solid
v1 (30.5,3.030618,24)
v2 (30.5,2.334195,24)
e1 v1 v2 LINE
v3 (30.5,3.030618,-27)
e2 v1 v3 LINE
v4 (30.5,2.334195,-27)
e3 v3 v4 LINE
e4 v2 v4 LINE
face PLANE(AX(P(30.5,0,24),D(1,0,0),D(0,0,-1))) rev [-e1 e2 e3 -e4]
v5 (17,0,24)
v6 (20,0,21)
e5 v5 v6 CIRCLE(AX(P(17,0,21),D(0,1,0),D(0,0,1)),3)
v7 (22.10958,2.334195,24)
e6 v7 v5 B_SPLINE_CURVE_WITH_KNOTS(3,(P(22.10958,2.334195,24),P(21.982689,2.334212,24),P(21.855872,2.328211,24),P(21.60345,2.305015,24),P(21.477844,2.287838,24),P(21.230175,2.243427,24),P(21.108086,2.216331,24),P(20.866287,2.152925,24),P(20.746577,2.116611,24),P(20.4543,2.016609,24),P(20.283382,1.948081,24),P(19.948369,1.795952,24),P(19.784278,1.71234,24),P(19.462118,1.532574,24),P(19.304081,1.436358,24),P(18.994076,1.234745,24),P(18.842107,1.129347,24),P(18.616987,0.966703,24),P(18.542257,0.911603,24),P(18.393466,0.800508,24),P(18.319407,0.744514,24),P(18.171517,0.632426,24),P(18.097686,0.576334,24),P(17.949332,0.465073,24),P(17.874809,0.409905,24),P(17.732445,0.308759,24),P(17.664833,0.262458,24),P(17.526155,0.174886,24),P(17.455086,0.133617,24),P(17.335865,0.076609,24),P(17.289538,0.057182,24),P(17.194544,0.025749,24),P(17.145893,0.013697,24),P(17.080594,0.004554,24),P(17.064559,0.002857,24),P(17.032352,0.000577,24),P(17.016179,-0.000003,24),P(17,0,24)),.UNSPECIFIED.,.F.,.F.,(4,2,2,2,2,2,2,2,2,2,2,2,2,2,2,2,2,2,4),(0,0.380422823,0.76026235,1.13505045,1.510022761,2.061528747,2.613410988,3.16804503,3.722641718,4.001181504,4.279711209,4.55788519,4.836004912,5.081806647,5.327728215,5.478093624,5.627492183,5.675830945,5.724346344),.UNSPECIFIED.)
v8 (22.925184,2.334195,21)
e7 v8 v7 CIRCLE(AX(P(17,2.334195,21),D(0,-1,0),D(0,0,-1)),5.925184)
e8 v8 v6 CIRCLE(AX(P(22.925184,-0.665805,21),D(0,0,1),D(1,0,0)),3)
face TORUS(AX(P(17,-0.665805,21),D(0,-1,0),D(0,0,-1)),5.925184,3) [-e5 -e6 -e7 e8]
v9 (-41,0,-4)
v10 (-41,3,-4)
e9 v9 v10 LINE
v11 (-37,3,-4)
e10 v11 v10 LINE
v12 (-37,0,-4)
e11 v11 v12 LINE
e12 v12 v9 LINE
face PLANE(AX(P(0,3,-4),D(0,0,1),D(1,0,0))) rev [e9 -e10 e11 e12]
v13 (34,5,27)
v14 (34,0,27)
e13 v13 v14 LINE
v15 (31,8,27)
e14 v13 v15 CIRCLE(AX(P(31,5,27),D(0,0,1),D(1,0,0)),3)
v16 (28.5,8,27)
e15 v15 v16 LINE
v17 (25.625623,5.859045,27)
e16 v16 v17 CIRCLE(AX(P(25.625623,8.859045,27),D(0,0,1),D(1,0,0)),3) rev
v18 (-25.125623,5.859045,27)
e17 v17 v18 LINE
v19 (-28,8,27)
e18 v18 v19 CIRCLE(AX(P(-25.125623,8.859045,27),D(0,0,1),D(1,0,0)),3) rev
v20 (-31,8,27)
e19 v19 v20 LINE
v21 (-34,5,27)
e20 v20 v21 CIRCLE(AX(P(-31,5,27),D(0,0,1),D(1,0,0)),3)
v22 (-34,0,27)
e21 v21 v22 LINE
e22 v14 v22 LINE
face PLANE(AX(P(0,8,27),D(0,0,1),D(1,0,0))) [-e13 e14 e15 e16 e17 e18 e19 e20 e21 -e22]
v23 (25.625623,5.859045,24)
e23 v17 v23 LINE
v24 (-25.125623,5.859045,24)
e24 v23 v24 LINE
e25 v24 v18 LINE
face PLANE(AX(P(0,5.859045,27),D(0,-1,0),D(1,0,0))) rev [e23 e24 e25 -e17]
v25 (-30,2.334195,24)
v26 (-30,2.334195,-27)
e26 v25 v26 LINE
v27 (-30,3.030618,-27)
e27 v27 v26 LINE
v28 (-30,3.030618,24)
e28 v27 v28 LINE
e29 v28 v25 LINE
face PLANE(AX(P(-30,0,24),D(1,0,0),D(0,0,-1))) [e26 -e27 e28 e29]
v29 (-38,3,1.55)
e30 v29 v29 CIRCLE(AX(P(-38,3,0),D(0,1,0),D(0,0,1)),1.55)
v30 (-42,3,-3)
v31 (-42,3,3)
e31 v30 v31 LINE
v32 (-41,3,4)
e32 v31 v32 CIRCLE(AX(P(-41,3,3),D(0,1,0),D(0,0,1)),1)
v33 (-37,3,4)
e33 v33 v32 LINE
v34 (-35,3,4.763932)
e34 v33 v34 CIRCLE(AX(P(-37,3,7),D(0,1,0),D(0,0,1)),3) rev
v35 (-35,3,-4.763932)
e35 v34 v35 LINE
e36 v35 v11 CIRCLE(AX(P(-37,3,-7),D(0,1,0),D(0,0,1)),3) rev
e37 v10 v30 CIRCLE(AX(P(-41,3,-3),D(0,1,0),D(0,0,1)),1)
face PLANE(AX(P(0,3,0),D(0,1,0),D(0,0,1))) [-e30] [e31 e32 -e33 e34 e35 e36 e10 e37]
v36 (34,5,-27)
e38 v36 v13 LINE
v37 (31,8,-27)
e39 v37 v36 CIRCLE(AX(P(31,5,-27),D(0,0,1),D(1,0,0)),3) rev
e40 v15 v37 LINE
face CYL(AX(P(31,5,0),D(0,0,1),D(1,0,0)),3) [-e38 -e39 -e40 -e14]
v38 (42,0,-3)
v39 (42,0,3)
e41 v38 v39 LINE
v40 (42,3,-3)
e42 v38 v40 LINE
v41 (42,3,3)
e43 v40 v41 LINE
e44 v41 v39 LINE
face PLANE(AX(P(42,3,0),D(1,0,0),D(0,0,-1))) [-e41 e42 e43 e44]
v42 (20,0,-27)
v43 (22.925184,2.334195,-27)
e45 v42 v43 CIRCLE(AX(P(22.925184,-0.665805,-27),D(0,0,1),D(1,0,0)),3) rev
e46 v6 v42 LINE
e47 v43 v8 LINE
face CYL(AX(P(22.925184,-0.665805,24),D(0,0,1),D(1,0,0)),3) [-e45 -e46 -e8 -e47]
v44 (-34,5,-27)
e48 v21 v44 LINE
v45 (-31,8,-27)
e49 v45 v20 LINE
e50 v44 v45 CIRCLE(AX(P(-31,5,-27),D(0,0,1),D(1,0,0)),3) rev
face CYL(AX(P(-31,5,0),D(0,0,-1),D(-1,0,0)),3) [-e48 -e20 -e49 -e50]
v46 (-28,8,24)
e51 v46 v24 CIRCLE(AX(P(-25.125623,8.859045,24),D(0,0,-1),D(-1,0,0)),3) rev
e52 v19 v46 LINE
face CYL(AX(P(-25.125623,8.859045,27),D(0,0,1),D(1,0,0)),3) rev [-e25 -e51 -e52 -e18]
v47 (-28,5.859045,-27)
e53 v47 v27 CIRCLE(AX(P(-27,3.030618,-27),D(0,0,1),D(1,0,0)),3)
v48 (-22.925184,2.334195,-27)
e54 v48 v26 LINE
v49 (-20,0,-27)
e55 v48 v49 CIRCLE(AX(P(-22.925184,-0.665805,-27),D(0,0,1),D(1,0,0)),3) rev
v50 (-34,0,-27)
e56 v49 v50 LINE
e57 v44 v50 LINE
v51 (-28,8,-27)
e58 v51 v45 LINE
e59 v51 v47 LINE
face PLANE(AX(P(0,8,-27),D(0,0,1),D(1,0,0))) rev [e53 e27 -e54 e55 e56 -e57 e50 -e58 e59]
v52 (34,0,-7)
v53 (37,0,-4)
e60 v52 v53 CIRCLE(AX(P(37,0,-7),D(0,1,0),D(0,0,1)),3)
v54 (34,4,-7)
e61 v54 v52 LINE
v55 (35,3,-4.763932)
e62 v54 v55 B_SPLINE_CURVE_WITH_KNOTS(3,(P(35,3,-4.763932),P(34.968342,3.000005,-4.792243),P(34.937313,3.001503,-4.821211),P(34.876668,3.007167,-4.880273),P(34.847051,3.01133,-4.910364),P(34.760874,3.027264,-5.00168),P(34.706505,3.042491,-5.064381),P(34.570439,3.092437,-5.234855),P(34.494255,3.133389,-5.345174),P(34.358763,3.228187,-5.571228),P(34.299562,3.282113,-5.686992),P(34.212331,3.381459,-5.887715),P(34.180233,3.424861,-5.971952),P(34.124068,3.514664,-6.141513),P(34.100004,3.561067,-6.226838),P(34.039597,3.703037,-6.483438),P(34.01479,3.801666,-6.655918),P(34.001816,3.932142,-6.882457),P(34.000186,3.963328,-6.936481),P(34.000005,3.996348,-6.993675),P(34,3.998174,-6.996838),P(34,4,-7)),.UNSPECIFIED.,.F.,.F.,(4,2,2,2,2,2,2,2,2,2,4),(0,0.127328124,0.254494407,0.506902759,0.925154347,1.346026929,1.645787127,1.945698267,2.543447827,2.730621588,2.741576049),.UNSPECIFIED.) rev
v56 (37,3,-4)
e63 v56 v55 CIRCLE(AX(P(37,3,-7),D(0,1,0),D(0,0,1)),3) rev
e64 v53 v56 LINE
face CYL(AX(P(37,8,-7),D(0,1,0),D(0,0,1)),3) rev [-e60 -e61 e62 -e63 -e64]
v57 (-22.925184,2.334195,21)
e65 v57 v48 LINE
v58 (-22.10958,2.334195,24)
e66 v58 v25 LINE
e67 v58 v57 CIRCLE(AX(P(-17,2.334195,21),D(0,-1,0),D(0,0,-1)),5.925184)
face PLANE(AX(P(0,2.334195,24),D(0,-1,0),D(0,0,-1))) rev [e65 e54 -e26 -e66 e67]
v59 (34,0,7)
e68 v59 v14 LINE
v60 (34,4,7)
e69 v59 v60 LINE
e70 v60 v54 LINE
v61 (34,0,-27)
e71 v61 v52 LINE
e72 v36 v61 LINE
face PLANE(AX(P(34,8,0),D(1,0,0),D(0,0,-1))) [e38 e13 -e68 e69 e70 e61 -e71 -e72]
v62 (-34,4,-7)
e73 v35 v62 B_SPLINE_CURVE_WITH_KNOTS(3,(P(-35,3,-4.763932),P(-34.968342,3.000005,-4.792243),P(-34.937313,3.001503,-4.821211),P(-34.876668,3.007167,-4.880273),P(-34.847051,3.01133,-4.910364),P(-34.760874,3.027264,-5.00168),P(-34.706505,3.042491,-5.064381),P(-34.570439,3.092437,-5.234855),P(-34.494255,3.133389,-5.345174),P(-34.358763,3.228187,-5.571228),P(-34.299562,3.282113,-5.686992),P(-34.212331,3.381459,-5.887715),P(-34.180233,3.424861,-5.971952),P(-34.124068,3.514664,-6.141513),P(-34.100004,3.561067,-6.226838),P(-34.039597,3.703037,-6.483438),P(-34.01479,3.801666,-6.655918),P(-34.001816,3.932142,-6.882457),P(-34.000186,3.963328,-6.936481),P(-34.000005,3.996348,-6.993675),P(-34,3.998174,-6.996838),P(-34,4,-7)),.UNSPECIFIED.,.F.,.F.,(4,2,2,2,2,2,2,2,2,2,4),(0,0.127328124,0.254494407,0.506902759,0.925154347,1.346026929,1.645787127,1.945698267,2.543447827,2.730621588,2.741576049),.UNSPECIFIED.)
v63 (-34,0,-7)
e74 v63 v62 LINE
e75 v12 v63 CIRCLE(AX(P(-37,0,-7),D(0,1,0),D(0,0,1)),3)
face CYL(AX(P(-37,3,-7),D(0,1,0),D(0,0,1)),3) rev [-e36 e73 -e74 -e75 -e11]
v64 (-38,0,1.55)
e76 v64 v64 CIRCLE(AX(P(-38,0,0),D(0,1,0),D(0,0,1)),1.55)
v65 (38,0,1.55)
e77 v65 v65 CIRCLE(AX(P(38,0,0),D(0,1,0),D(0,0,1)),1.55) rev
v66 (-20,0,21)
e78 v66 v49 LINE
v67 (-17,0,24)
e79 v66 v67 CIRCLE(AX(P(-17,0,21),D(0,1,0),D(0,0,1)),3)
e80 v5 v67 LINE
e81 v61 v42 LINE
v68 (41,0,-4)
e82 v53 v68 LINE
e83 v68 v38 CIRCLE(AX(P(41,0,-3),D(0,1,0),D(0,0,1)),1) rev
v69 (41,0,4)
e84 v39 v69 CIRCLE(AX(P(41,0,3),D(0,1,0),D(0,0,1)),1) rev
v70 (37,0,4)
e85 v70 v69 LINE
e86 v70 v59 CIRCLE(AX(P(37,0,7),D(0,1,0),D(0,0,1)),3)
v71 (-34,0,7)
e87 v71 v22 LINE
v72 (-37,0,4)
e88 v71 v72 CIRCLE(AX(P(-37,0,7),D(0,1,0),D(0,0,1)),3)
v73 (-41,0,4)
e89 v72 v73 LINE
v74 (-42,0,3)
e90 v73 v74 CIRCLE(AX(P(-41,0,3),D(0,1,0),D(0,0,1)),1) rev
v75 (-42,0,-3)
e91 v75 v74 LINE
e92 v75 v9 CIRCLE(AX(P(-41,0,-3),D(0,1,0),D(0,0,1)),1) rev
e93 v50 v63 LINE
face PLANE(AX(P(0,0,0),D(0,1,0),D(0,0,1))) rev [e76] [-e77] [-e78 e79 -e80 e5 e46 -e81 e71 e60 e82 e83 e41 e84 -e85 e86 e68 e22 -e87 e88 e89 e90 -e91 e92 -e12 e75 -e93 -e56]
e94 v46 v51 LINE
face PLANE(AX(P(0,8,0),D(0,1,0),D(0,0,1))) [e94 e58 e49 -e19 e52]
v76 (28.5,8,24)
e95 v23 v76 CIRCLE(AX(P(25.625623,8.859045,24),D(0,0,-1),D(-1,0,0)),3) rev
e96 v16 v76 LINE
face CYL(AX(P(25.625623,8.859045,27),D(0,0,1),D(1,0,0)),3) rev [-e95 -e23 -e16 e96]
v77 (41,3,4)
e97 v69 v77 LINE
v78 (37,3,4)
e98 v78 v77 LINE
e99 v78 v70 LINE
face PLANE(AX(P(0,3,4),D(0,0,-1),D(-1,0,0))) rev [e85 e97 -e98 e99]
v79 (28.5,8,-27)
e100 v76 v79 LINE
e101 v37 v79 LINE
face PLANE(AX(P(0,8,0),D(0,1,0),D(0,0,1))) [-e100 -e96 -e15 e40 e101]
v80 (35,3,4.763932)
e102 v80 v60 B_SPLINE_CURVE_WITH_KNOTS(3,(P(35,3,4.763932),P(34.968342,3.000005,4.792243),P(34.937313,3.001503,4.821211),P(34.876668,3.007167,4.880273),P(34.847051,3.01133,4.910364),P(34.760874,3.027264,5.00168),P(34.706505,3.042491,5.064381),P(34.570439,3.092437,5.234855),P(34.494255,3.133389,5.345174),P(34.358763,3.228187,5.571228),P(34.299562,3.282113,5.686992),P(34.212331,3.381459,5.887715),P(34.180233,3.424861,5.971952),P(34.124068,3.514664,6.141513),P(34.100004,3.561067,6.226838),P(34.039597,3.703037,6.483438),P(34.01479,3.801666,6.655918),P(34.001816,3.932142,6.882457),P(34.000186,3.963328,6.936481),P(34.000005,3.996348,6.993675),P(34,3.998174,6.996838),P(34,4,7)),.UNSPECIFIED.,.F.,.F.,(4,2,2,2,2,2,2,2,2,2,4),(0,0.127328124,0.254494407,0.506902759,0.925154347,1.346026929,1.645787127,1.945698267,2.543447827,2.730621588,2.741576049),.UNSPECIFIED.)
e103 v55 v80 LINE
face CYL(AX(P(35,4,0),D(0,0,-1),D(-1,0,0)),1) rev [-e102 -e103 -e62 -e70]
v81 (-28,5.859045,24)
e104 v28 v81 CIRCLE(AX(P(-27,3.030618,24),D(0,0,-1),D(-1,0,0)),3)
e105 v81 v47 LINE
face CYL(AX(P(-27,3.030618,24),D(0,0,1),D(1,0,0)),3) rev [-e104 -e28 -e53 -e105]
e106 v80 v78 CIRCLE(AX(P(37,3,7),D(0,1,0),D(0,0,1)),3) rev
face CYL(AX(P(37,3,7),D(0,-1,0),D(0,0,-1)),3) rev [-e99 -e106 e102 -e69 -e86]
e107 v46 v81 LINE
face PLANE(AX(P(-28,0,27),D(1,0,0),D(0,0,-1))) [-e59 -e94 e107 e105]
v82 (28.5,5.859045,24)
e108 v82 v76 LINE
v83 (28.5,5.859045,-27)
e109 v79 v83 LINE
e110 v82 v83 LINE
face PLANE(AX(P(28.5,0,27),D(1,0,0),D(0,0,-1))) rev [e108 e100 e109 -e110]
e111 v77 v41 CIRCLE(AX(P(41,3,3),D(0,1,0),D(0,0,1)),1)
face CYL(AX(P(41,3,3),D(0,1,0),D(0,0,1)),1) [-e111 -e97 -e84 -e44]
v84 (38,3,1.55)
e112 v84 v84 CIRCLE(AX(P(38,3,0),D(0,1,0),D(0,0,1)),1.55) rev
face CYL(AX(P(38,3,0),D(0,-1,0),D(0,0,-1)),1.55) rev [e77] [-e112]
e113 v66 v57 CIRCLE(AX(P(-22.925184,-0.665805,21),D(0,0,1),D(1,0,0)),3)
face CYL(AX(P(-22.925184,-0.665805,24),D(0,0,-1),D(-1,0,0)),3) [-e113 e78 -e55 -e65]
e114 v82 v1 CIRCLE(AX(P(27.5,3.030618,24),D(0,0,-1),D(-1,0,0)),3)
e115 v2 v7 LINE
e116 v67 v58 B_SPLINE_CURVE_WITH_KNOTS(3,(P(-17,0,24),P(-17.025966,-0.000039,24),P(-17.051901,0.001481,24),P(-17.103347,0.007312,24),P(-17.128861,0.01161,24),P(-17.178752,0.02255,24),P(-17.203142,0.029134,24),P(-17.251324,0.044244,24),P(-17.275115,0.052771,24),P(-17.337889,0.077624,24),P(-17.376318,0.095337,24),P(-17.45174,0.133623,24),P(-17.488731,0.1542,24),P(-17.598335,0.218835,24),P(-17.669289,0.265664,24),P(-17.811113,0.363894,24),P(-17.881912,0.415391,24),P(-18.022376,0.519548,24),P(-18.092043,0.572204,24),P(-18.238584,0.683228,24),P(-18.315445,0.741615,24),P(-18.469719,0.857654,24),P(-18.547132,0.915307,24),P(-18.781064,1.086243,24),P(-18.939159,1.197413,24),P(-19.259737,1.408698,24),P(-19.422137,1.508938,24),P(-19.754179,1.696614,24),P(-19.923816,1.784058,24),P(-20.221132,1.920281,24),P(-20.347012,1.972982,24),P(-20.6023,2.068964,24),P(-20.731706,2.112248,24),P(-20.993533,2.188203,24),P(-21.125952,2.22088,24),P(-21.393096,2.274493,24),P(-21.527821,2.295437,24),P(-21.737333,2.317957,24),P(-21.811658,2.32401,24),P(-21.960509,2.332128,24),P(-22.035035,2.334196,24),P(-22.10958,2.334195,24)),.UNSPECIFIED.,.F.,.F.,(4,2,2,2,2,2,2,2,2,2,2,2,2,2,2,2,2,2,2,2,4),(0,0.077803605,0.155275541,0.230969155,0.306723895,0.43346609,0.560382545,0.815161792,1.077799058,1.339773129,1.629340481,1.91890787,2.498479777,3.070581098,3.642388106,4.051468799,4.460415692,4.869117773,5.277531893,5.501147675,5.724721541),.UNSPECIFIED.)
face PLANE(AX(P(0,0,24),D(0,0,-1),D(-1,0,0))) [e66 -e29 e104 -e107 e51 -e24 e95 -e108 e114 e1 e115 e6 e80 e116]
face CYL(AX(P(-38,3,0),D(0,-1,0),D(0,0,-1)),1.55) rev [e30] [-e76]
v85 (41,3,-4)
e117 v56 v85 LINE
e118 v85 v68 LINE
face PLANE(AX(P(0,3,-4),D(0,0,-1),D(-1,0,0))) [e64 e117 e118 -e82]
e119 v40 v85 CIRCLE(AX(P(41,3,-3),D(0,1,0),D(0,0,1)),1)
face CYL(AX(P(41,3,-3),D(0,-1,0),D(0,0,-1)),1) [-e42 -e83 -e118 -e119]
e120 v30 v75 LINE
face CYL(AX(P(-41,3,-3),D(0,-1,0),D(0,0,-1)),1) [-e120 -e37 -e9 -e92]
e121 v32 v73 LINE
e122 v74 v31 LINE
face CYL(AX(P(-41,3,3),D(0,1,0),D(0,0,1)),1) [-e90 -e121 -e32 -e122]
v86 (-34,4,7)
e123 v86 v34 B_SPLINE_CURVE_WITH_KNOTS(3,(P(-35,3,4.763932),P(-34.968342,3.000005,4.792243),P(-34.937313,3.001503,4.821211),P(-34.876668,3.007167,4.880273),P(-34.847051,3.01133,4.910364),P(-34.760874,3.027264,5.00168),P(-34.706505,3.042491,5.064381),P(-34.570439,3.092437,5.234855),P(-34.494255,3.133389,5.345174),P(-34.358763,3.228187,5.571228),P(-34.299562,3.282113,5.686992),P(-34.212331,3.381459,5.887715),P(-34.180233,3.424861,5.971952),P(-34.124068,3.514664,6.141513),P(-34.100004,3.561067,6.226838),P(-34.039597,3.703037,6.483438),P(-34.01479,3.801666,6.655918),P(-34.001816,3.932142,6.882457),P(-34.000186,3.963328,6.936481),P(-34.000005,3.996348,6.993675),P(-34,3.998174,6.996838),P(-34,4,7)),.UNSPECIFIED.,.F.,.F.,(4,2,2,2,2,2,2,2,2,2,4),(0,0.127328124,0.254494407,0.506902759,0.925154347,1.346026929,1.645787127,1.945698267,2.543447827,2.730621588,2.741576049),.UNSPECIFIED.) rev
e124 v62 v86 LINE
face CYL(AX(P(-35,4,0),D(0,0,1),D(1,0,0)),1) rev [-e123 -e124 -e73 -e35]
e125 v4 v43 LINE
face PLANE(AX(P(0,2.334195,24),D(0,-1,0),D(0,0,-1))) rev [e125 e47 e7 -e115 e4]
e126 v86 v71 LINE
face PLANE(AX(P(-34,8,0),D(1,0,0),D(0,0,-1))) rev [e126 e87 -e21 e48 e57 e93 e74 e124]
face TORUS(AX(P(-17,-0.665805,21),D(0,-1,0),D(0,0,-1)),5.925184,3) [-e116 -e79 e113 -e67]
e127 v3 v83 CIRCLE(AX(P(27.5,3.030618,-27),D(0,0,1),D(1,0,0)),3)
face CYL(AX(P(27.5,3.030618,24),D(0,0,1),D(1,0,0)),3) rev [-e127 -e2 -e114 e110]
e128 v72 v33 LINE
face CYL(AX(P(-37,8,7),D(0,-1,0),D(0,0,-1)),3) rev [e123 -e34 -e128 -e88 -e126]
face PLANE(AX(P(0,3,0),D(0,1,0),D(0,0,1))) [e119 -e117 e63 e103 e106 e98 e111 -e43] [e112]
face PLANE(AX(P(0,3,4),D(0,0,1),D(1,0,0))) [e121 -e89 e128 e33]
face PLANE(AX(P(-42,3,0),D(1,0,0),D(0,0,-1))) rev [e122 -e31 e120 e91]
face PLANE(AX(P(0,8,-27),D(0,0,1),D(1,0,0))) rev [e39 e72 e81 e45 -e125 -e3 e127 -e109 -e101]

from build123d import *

# Parameters (mm, degrees)
SKETCH1_W           = 68
SKETCH1_H           = 54
BOSS_EXTRUDE1_DEPTH = 8
CUT_EXTRUDE1_DEPTH  = 51
SKETCH2_3_W         = 28.5
SKETCH2_3_H         = 2.140954579
SKETCH2_3_W_2       = 28
CUT_EXTRUDE2_DEPTH  = 65.311740763
FILLET1_R           = 3
FILLET2_R           = 3
SKETCH3_W           = 40
SKETCH3_H           = 2.334194627
CUT_EXTRUDE3_DEPTH  = 51
FILLET3_R           = 3
FILLET4_R           = 3
FILLET5_R           = 3
SKETCH1_3_W         = 8
SKETCH1_3_H         = 8
SKETCH1_3_R         = 1.55
BOSS_EXTRUDE2_DEPTH = 3
FILLET6_R           = 3
FILLET7_R           = 1
FILLET8_R           = 1
FILLET9_R           = 1


with BuildPart() as part:
    # Sketch1 → Boss-Extrude1 (new body)
    with BuildSketch(Plane(origin=(0, 0, 0), x_dir=(1, 0, 0), z_dir=(0, 1, 0))):
        Rectangle(SKETCH1_W, SKETCH1_H)
    extrude(amount=BOSS_EXTRUDE1_DEPTH)

    # Sketch2 → Cut-Extrude1 (cut)
    with BuildSketch(Plane(origin=(0, 0, -27), x_dir=(-1, 0, 0), z_dir=(0, 0, -1))):
        Polygon((-30.5, 2.334194627), (0, 2.334194627), (0, 5.859045421), (-28.5, 5.859045421), (-30.5, 5.859045421), align=None)
        Polygon((0, 5.859045421), (0, 2.334194627), (30, 2.334194627), (30, 5.859045421), (28, 5.859045421), align=None)
    extrude(amount=-CUT_EXTRUDE1_DEPTH, mode=Mode.SUBTRACT)

    # Sketch2<3> → Cut-Extrude2 (cut, through all)
    with BuildSketch(Plane(origin=(0, 0, -27), x_dir=(-1, 0, 0), z_dir=(0, 0, -1))):
        with Locations((-14.25, 6.929522711)):
            Rectangle(SKETCH2_3_W, SKETCH2_3_H)
        with Locations((14, 6.929522711)):
            Rectangle(SKETCH2_3_W_2, SKETCH2_3_H)
    extrude(amount=-CUT_EXTRUDE2_DEPTH, mode=Mode.SUBTRACT)

    # Fillet1
    # the kernel refuses this fillet: 3 mm, written as the material it adds along each edge
    with BuildSketch(Plane(origin=(30.5, 5.859045421, -27), x_dir=(0, -1, 0), z_dir=(0, 0, 1))) as fillet1_piece_1:
        with BuildLine():
            CenterArc((2.828427125, -3), FILLET1_R, 90, 70.528779366)
            Line((0, -2), (-0.056568542, -1.98))
            ThreePointArc((-0.056568542, -1.98), (-0.06, -1), (-0.06, 0))
            Line((-0.06, 0), (0, 0.06))
            Line((0, 0.06), (2.828427125, 0.06))
            Line((2.828427125, 0.06), (2.828427125, 0))
        make_face()
    extrude(amount=51)
    with BuildSketch(Plane(origin=(-30, 5.859045421, -27), x_dir=(1, 0, 0), z_dir=(0, 0, 1))) as fillet1_piece_2:
        with BuildLine():
            CenterArc((3, -2.828427125), FILLET1_R, 109.471220634, 70.528779366)
            Line((0, -2.828427125), (-0.06, -2.828427125))
            Line((-0.06, -2.828427125), (-0.06, 0))
            Line((-0.06, 0), (0, 0.06))
            ThreePointArc((0, 0.06), (1, 0.06), (1.98, 0.056568542))
            Line((1.98, 0.056568542), (2, 0))
        make_face()
    extrude(amount=51)

    # Fillet2
    fillet2_edges = [part.edges().sort_by_distance(p)[0] for p in [
        (34, 8, 0),
        (-34, 8, 0),
    ]]
    fillet(fillet2_edges, radius=FILLET2_R)

    # Sketch3 → Cut-Extrude3 (cut)
    with BuildSketch(Plane(origin=(0, 0, -27), x_dir=(-1, 0, 0), z_dir=(0, 0, -1))):
        with Locations((0, 1.167097314)):
            Rectangle(SKETCH3_W, SKETCH3_H)
    extrude(amount=-CUT_EXTRUDE3_DEPTH, mode=Mode.SUBTRACT)

    # Fillet3
    fillet3_edges = [part.edges().sort_by_distance(p)[0] for p in [
        (20, 1.167097313, 24),
        (-20, 1.167097313, 24),
    ]]
    fillet(fillet3_edges, radius=FILLET3_R)

    # Fillet4
    # the kernel refuses this fillet: 3 mm, written as the material it takes off along each edge
    with BuildSketch(Plane(origin=(-17, 2.334194627, 21), x_dir=(0.6464786745536378, 0, -0.762932056835582), z_dir=(-0.762932056835582, 0, -0.6464786745536378))) as fillet4_piece_1_section:
        with BuildLine():
            CenterArc((5.925184303, 3), FILLET4_R, 192.822717627, 77.177282373)
            Line((3, 2.334194627), (3, 0))
            Line((3, 0), (5.925184303, 0))
        make_face()
    fillet4_piece_1 = revolve(axis=Axis((-17, 2.334194627, 21), (0, -1, 0)), revolution_arc=229.72336785, mode=Mode.PRIVATE)
    fillet4_piece_1 = split(fillet4_piece_1, bisect_by=Plane(origin=(-17, 2.334194627, 24), z_dir=(0, 0, -1)), keep=Keep.TOP, mode=Mode.PRIVATE)
    add(fillet4_piece_1, mode=Mode.SUBTRACT)
    with BuildSketch(Plane(origin=(17, 2.334194627, 21), x_dir=(1, 0, 0), z_dir=(0, 0, -1))) as fillet4_piece_2_section:
        with BuildLine():
            CenterArc((5.925184303, 3), FILLET4_R, 192.822717627, 77.177282373)
            Line((3, 2.334194627), (3, 0))
            Line((3, 0), (5.925184303, 0))
        make_face()
    fillet4_piece_2 = revolve(axis=Axis((17, 2.334194627, 21), (0, -1, 0)), revolution_arc=229.72336785, mode=Mode.PRIVATE)
    fillet4_piece_2 = split(fillet4_piece_2, bisect_by=Plane(origin=(17, 2.334194627, 24), z_dir=(0, 0, -1)), keep=Keep.TOP, mode=Mode.PRIVATE)
    add(fillet4_piece_2, mode=Mode.SUBTRACT)
    with BuildSketch(Plane(origin=(-20, 2.334194627, -34.312960757), x_dir=(-1, 0, 0), z_dir=(0, 0, 1))) as fillet4_piece_3:
        with BuildLine():
            CenterArc((2.925184303, 3), FILLET4_R, 192.822717627, 77.177282373)
            Line((0, 2.334194627), (0, 0))
            Line((0, 0), (2.925184303, 0))
        make_face()
    extrude(amount=55.312960757, mode=Mode.SUBTRACT)
    with BuildSketch(Plane(origin=(20, 2.334194627, -34.312960757), x_dir=(1, 0, 0), z_dir=(0, 0, 1))) as fillet4_piece_4:
        with BuildLine():
            CenterArc((2.925184303, -3), FILLET4_R, 90, 77.177282373)
            Line((0, -2.334194627), (0, 0))
            Line((0, 0), (2.925184303, 0))
        make_face()
    extrude(amount=55.312960757, mode=Mode.SUBTRACT)

    # Fillet5
    # the kernel refuses this fillet: 3 mm, written as the material it adds along each edge
    with BuildSketch(Plane(origin=(28.5, 5.859045421, 24), x_dir=(-1, 0, 0), z_dir=(0, 0, 1))) as fillet5_piece_1:
        with BuildLine():
            CenterArc((2.874376622, -3), FILLET5_R, 90, 73.360529794)
            Line((0, -2.140954579), (-0.057487532, -2.123773671))
            ThreePointArc((-0.057487532, -2.123773671), (-0.06, -1.07047729), (-0.06, 0))
            Line((-0.06, 0), (0, 0.06))
            Line((0, 0.06), (2.874376622, 0.06))
            Line((2.874376622, 0.06), (2.874376622, 0))
        make_face()
    extrude(amount=3)
    with BuildSketch(Plane(origin=(-28, 5.859045421, 24), x_dir=(1, 0, 0), z_dir=(0, 0, 1))) as fillet5_piece_2:
        with BuildLine():
            CenterArc((2.874376622, 3), FILLET5_R, 196.639470206, 73.360529794)
            Line((0, 2.140954579), (-0.057487532, 2.123773671))
            ThreePointArc((-0.057487532, 2.123773671), (-0.06, 1.07047729), (-0.06, 0))
            Line((-0.06, 0), (0, -0.06))
            Line((0, -0.06), (2.874376622, -0.06))
            Line((2.874376622, -0.06), (2.874376622, 0))
        make_face()
    extrude(amount=3)

    # Sketch1<3> → Boss-Extrude2 (add)
    # profile 1 of 2: a face of its own
    with BuildSketch(Plane(origin=(0, 0, 0), x_dir=(1, 0, 0), z_dir=(0, 1, 0))):
        with Locations((-38, 0)):
            Rectangle(SKETCH1_3_W, SKETCH1_3_H)
        with Locations(Location((-38, 0, 0), (0, 0, 270))):
            Circle(SKETCH1_3_R, mode=Mode.SUBTRACT)
    # profile 2 of 2: a face of its own
    with BuildSketch(Plane(origin=(0, 0, 0), x_dir=(1, 0, 0), z_dir=(0, 1, 0))):
        with Locations((38, 0)):
            Rectangle(SKETCH1_3_W, SKETCH1_3_H)
        with Locations(Location((38, 0, 0), (0, 0, 270))):
            Circle(SKETCH1_3_R, mode=Mode.SUBTRACT)
    extrude(amount=BOSS_EXTRUDE2_DEPTH)

    # Fillet6
    fillet6_edges = [part.edges().sort_by_distance(p)[0] for p in [
        (-34, 1.5, -4),
        (-34, 1.5, 4),
        (34, 1.5, -4),
        (34, 1.5, 4),
    ]]
    fillet(fillet6_edges, radius=FILLET6_R)

    # Fillet7
    fillet7_edges = [part.edges().sort_by_distance(p)[0] for p in [
        (34, 3, 0),
    ]]
    fillet(fillet7_edges, radius=FILLET7_R)

    # Fillet8
    fillet8_edges = [part.edges().sort_by_distance(p)[0] for p in [
        (-34, 3, 0),
    ]]
    fillet(fillet8_edges, radius=FILLET8_R)

    # Fillet9
    fillet9_edges = [part.edges().sort_by_distance(p)[0] for p in [
        (-42, 1.5, -4),
        (-42, 1.5, 4),
        (42, 1.5, -4),
        (42, 1.5, 4),
    ]]
    fillet(fillet9_edges, radius=FILLET9_R)


solid = part.part
